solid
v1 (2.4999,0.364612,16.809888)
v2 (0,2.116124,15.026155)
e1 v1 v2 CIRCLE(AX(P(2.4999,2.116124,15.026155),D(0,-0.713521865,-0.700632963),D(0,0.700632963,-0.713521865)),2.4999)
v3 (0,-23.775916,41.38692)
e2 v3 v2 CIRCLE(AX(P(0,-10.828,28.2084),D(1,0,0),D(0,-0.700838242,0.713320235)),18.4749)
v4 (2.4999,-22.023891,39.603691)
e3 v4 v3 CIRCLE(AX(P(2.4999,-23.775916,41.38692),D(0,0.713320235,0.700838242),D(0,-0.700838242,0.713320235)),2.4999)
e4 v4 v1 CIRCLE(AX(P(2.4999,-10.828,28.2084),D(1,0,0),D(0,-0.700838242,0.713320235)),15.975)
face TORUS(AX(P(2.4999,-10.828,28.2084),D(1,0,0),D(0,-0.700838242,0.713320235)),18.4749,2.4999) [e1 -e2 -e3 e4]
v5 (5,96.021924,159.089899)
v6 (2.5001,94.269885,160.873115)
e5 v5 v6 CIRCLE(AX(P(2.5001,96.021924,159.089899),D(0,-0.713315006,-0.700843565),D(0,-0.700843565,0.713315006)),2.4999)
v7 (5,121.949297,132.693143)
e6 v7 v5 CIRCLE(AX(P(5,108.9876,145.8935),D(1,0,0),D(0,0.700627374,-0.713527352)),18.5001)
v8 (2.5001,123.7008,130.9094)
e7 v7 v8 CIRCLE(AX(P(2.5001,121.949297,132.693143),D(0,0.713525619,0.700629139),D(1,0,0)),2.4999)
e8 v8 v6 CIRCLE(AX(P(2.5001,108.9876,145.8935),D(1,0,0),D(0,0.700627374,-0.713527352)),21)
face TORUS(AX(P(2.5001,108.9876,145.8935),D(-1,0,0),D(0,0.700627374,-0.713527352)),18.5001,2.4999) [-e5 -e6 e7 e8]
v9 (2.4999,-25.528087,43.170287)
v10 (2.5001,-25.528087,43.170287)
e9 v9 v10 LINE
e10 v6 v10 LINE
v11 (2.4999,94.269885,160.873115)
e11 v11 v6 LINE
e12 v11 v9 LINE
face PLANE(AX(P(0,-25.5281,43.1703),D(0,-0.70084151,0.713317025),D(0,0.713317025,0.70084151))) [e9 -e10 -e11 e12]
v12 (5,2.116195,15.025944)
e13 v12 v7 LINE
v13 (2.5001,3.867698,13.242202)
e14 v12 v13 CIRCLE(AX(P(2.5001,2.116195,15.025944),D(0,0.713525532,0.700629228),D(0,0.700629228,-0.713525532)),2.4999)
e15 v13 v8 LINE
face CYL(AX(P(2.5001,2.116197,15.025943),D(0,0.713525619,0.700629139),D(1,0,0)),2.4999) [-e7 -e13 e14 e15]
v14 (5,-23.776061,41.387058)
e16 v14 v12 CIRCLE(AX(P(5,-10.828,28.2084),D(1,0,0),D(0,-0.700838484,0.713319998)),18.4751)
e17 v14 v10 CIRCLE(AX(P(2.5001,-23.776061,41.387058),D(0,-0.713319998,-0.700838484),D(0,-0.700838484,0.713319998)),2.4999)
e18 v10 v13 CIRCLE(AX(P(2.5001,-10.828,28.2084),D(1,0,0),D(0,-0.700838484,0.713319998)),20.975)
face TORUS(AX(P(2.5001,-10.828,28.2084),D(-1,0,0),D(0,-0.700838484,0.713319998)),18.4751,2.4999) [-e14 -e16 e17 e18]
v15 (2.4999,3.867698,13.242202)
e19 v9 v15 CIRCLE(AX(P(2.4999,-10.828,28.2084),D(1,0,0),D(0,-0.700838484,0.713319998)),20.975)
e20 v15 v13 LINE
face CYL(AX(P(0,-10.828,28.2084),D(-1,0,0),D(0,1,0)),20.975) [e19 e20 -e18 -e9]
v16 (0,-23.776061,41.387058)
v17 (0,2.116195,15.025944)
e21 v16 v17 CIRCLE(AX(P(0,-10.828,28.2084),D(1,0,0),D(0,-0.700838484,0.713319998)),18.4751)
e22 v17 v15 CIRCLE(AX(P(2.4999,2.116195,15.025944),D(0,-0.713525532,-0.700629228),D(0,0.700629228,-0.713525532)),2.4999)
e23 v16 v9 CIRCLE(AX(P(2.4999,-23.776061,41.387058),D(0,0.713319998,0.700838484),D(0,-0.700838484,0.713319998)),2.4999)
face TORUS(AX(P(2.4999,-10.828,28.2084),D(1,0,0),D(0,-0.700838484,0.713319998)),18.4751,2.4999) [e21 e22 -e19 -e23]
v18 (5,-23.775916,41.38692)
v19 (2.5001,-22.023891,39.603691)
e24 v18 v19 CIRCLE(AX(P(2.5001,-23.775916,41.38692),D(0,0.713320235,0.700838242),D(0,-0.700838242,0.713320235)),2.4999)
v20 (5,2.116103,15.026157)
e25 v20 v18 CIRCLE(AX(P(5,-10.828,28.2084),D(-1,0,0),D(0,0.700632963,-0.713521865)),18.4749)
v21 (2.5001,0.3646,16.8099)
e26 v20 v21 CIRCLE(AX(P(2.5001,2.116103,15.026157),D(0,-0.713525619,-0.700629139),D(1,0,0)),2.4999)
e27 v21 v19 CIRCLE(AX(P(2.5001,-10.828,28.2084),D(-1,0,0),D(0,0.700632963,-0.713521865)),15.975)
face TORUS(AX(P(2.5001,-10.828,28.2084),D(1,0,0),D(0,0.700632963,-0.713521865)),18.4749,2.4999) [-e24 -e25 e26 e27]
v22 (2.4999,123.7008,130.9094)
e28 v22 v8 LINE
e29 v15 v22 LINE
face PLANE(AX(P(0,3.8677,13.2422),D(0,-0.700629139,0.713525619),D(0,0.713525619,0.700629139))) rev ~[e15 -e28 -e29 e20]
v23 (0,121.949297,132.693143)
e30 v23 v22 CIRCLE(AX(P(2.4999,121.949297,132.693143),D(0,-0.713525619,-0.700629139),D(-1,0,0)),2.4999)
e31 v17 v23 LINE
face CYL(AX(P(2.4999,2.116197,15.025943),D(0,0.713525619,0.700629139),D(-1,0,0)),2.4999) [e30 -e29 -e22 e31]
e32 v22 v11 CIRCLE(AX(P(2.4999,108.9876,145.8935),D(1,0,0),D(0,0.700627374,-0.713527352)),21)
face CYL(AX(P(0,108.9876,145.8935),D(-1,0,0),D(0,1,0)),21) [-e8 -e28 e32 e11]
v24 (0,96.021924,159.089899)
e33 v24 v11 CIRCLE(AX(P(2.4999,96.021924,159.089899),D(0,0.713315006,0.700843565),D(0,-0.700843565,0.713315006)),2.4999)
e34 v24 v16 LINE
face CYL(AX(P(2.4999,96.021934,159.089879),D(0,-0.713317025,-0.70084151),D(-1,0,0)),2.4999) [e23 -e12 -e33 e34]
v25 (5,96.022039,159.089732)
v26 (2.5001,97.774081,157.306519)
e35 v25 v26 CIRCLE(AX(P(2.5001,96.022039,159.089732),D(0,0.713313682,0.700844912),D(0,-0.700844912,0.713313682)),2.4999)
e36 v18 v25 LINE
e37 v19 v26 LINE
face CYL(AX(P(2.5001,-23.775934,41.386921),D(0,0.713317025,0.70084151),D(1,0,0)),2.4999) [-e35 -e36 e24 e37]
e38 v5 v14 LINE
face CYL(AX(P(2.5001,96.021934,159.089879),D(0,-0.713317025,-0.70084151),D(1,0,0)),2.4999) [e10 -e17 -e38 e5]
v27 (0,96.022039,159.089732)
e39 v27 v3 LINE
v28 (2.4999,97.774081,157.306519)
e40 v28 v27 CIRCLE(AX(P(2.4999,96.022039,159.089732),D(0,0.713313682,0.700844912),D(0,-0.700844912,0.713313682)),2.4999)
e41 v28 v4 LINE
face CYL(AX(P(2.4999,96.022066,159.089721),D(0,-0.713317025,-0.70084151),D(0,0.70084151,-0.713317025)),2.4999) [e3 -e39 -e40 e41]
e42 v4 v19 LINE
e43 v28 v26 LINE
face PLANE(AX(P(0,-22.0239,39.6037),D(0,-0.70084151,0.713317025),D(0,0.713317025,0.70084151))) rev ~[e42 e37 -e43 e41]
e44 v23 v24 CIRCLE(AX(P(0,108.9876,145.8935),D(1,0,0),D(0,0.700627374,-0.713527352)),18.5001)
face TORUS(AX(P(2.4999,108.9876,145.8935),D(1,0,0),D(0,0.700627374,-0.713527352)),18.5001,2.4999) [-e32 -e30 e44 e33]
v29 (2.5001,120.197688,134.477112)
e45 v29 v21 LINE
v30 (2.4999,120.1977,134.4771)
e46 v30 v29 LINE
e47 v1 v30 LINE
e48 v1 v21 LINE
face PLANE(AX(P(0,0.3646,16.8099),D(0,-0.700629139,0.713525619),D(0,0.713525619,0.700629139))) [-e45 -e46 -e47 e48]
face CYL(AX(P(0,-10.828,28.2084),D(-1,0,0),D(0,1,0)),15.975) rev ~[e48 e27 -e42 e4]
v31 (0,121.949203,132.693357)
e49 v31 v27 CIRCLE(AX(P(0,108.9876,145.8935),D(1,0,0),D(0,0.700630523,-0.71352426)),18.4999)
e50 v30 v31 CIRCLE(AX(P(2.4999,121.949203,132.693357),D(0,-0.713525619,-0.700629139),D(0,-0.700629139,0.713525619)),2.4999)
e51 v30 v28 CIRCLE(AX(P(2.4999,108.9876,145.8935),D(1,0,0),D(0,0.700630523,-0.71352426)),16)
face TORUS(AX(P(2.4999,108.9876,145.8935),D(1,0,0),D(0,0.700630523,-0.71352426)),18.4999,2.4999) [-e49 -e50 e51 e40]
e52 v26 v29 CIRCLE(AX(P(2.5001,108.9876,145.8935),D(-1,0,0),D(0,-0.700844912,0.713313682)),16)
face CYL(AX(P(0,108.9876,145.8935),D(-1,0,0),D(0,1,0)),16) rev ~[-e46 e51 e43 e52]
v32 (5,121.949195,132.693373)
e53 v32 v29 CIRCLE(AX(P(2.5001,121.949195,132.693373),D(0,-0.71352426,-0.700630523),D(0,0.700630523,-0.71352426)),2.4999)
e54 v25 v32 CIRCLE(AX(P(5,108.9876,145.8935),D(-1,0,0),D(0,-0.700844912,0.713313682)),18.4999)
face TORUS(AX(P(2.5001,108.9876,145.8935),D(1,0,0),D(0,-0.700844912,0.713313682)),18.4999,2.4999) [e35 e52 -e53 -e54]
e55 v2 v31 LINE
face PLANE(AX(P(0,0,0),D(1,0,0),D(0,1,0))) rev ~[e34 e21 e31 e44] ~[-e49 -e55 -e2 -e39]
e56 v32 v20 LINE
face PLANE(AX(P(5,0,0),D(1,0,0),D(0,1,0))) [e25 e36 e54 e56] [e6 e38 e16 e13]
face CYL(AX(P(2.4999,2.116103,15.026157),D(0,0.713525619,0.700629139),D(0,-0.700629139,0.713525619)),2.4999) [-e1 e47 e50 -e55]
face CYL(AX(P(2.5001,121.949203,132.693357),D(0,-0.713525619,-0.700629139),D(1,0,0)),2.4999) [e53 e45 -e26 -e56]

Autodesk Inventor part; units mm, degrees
ref_plane "YZ Plane" through (0, 0, 0) normal (1, 0, 0) x (0, 1, 0)
ref_plane "XZ Plane" through (0, 0, 0) normal (0, 1, 0) x (-1, 0, 0)
ref_plane "XY Plane" through (0, 0, 0) normal (0, 0, 1) x (1, 0, 0)
sketch "Sketch1" plane through (0, 0, 0) normal (1, 0, 0) x (0, 1, 0)
  circle A0 centre (-10.828, 28.2084) radius 15.975 projected
  circle A1 centre (108.9876, 145.8935) radius 16
  line L0 (0.3646, 16.8099) -> (120.1977, 134.4771)
  line L1 (-22.0239, 39.6037) -> (97.7741, 157.3065)
  circle A2 centre (-10.828, 28.2084) radius 20.975
  line L2 (-25.5281, 43.1703) -> (94.2699, 160.8731)
  line L3 (3.8677, 13.2422) -> (123.7008, 130.9094)
  circle A3 centre (108.9876, 145.8935) radius 21
  point P0 (0, 0)
  dimension "d0" = 5
  dimension "d1" = 5
  dimension "d2" = 5
  dimension "d3" = 5
extrude "Extrusion1" add sketch "Sketch1" along normal blind 5 contours A0 L0 A2 L1 | A2 L2 A3 L1 | L0 A3 L3 A2 | A3 L0 A1 L1 picked at (6.4932, 21.5544) picked at (91.6433, 152.5567)
fillet "Fillet1" radius 2.5 16 edges at (0, -25.792, 13.5105) (0, 63.7843, 72.0758) (0, 123.9694, 160.6089) (0, 34.3709, 102.0217) (5, -25.792, 13.5105) (5, 63.7843, 72.0758) (5, 123.9694, 160.6089) (5, 34.3709, 102.0217) (5, 120.4023, 157.1052) (5, 60.2811, 75.6435) (5, -22.2249, 17.0142) (5, 37.8751, 98.4551) (0, -22.2249, 17.0142) (0, 37.8751, 98.4551) (0, 120.4023, 157.1052) (0, 60.2811, 75.6435)
properties part number "belt"
